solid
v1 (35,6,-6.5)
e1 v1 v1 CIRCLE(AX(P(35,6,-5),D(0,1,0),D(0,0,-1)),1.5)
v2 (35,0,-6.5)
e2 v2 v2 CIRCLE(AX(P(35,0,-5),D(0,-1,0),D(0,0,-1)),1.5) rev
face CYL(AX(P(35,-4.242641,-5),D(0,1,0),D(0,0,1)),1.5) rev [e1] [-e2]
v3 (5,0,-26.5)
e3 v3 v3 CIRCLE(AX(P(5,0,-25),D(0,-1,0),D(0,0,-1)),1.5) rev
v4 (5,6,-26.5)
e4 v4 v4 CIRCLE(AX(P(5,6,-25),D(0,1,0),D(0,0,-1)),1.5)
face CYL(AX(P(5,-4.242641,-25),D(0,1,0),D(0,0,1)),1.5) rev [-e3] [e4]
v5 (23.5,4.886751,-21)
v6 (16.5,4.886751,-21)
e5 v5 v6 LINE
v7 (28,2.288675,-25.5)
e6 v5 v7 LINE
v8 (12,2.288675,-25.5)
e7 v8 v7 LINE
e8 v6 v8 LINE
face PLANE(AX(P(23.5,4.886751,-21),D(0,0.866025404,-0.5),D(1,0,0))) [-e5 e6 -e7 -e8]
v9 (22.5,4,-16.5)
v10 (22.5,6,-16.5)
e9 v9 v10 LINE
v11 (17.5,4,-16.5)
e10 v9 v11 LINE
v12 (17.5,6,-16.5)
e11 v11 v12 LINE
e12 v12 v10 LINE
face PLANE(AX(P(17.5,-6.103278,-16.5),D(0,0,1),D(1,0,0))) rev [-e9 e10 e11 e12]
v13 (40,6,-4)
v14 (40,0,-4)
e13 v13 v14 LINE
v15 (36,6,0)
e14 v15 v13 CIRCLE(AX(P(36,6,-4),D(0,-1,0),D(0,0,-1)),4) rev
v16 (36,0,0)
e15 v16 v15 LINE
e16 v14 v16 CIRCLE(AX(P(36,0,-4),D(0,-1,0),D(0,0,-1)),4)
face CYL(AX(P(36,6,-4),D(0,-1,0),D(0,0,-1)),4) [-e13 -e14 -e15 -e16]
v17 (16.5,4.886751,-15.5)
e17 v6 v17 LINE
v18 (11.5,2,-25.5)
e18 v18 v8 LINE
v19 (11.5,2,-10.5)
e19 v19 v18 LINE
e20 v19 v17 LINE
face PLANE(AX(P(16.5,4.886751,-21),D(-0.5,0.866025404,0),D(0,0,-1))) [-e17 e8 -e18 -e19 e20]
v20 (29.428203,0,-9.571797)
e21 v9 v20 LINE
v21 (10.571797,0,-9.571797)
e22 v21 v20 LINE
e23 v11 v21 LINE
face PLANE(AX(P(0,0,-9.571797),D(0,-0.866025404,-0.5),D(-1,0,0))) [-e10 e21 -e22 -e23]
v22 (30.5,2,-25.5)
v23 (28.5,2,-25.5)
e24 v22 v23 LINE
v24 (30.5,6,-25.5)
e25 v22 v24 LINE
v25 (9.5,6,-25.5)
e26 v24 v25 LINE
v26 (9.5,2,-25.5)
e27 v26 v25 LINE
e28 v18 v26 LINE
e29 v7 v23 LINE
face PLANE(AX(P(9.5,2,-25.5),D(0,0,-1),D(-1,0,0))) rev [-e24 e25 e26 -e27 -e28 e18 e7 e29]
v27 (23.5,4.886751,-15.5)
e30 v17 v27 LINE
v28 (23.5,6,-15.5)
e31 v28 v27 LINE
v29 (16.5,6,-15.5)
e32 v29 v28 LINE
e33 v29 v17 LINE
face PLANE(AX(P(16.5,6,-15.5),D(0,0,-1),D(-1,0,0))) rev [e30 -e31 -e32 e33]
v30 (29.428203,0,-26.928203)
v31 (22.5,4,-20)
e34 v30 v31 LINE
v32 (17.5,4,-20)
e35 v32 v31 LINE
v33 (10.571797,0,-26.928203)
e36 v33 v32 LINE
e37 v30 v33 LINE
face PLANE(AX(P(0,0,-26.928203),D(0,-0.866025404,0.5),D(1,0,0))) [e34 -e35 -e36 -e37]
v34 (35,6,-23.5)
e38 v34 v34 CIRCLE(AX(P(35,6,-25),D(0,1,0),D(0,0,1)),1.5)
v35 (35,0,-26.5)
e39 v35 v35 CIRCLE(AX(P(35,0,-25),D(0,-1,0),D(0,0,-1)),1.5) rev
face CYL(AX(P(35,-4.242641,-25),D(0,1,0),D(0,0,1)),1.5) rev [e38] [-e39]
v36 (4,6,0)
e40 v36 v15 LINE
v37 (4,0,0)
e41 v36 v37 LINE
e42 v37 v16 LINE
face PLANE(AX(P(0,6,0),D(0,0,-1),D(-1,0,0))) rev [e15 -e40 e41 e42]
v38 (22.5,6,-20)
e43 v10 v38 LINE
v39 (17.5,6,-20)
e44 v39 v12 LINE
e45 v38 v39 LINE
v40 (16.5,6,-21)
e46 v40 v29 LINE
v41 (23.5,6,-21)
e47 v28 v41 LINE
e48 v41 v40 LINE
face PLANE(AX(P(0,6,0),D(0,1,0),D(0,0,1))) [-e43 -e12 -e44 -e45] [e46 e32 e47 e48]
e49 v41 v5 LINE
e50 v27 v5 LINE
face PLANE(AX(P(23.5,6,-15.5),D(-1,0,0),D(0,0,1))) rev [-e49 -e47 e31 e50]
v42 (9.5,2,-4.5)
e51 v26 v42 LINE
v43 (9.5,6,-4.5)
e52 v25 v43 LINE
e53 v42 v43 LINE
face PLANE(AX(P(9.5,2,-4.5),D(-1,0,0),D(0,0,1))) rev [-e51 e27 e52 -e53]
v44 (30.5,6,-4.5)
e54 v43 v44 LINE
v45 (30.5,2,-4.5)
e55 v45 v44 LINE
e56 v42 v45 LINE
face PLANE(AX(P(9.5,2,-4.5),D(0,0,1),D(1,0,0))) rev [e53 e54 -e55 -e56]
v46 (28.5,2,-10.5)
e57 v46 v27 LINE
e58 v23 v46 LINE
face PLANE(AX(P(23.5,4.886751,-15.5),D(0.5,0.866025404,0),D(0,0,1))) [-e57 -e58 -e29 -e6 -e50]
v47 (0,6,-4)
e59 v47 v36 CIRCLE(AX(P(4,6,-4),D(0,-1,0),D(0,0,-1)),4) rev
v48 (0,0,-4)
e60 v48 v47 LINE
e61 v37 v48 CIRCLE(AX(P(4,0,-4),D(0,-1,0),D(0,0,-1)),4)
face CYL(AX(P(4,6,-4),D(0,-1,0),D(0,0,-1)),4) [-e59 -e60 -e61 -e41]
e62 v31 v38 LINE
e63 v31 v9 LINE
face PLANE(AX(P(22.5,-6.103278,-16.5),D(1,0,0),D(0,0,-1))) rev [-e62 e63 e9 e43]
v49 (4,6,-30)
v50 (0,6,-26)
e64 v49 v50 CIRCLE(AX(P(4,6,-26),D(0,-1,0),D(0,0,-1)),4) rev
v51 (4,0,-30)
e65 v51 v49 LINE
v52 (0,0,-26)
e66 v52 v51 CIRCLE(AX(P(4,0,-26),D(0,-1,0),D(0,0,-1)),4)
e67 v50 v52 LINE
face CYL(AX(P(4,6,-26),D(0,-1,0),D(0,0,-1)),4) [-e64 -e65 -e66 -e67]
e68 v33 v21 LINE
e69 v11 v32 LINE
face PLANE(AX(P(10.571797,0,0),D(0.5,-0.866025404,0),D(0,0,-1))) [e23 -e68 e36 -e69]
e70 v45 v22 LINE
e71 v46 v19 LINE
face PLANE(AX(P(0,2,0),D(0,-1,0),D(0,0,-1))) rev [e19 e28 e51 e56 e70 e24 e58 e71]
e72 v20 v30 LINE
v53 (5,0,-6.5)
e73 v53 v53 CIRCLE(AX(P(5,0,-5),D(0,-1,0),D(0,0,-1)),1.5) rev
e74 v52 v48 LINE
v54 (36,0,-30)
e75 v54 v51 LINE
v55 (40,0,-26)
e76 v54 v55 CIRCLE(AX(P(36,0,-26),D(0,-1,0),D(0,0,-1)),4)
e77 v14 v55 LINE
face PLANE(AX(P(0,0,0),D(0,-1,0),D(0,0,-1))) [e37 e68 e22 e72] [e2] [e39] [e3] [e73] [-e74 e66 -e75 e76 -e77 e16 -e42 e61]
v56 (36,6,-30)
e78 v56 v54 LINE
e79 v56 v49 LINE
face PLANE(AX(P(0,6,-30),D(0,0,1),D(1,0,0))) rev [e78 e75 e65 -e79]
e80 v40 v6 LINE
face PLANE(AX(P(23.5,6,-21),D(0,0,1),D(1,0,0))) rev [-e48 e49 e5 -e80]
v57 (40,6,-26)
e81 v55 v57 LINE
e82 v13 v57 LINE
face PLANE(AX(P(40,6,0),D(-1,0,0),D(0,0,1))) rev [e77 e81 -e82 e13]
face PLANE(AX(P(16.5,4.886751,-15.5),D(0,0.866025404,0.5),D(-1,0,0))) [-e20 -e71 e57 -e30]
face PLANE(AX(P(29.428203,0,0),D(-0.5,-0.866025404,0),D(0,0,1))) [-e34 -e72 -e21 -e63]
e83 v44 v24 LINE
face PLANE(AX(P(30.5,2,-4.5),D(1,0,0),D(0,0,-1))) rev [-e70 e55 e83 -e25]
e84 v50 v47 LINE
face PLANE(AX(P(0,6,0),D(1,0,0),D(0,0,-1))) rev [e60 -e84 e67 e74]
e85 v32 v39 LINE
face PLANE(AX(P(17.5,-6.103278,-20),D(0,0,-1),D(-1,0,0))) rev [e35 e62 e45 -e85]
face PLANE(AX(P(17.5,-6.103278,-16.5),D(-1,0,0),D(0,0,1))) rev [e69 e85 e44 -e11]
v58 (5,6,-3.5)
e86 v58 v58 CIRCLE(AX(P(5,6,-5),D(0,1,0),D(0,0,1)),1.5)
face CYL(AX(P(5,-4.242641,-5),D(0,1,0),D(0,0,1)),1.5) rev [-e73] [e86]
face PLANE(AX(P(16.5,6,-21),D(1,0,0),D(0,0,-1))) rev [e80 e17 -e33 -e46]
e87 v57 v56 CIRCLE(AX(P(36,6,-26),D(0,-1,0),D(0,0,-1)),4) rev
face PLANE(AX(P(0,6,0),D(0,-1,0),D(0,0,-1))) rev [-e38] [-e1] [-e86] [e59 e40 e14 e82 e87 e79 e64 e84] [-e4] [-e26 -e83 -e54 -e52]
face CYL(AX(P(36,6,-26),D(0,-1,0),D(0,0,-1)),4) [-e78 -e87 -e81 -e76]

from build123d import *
from OCP.BRepFilletAPI import BRepFilletAPI_MakeChamfer

# Parameters (mm, degrees)
SKETCH1_W           = 40
SKETCH1_H           = 30
BOSS_EXTRUDE1_DEPTH = 6
SKETCH2_R           = 1.5
CUT_EXTRUDE1_DEPTH  = 6
FILLET1_R           = 4
SKETCH3_W           = 21
SKETCH3_H           = 21
CUT_EXTRUDE2_DEPTH  = 4
SKETCH6_W           = 5
SKETCH6_H           = 3.5
CUT_EXTRUDE3_DEPTH  = 2
SKETCH7_W           = 7
SKETCH7_H           = 5.5
SKETCH7_W_2         = 5
SKETCH7_H_2         = 3.5
BOSS_EXTRUDE2_DEPTH = 4
CHAMFER1_SIZE       = 4
CHAMFER1_SIZE2      = 6.92820323
CHAMFER2_SIZE       = 2.886751346
CHAMFER2_SIZE_2     = 5


with BuildPart() as part:
    # Sketch1 → Boss-Extrude1 (new body)
    with BuildSketch(Plane(origin=(0, 0, 0), x_dir=(1, 0, 0), z_dir=(0, 1, 0))):
        with Locations((20, 15)):
            Rectangle(SKETCH1_W, SKETCH1_H)
    extrude(amount=BOSS_EXTRUDE1_DEPTH)

    # Sketch2 → Cut-Extrude1 (cut)
    with BuildSketch(Plane(origin=(0, 6, 0), x_dir=(1, 0, 0), z_dir=(0, 1, 0))):
        with Locations(Location((5, 5, 0), (0, 0, 270))):
            Circle(SKETCH2_R)
        with Locations(Location((5, 25, 0), (0, 0, 90))):
            Circle(SKETCH2_R)
        with Locations(Location((35, 5, 0), (0, 0, 90))):
            Circle(SKETCH2_R)
        with Locations(Location((35, 25, 0), (0, 0, 270))):
            Circle(SKETCH2_R)
    extrude(amount=-CUT_EXTRUDE1_DEPTH, mode=Mode.SUBTRACT)

    # Fillet1
    fillet1_edges = [part.edges().sort_by_distance(p)[0] for p in [
        (0, 3, -30),
        (40, 3, -30),
        (40, 3, 0),
        (0, 3, 0),
    ]]
    fillet(fillet1_edges, radius=FILLET1_R)

    # Sketch3 → Cut-Extrude2 (cut)
    with BuildSketch(Plane(origin=(0, 6, 0), x_dir=(1, 0, 0), z_dir=(0, 1, 0))):
        with Locations((20, 15)):
            Rectangle(SKETCH3_W, SKETCH3_H)
    extrude(amount=-CUT_EXTRUDE2_DEPTH, mode=Mode.SUBTRACT)

    # Sketch6 → Cut-Extrude3 (cut)
    with BuildSketch(Plane(origin=(0, 2, 0), x_dir=(1, 0, 0), z_dir=(0, 1, 0))):
        with Locations((20, 18.25)):
            Rectangle(SKETCH6_W, SKETCH6_H)
    extrude(amount=-CUT_EXTRUDE3_DEPTH, mode=Mode.SUBTRACT)

    # Sketch7 → Boss-Extrude2 (add)
    with BuildSketch(Plane(origin=(0, 2, 0), x_dir=(1, 0, 0), z_dir=(0, 1, 0))):
        with Locations((20, 18.25)):
            Rectangle(SKETCH7_W, SKETCH7_H)
        with Locations((20, 18.25)):
            Rectangle(SKETCH7_W_2, SKETCH7_H_2, mode=Mode.SUBTRACT)
    extrude(amount=BOSS_EXTRUDE2_DEPTH)

    # Chamfer1: one chamfer whose edges measure the first distance from different faces: ONE call of the kernel's chamfer builder (chamfer() names one face for all edges)
    chamfer1_edges_1 = [part.edges().sort_by_distance(p)[0] for p in [
        (20, 0, -16.5),
    ]]
    chamfer1_side_1 = [part.faces().sort_by_distance(p)[0] for p in [
        (20, 3, -16.5),
    ]]
    chamfer1_edges_2 = [part.edges().sort_by_distance(p)[0] for p in [
        (22.5, 0, -18.25),
    ]]
    chamfer1_side_2 = [part.faces().sort_by_distance(p)[0] for p in [
        (22.5, 3, -18.25),
    ]]
    chamfer1_edges_3 = [part.edges().sort_by_distance(p)[0] for p in [
        (20, 0, -20),
    ]]
    chamfer1_side_3 = [part.faces().sort_by_distance(p)[0] for p in [
        (20, 3, -20),
    ]]
    chamfer1_edges_4 = [part.edges().sort_by_distance(p)[0] for p in [
        (17.5, 0, -18.25),
    ]]
    chamfer1_side_4 = [part.faces().sort_by_distance(p)[0] for p in [
        (17.5, 3, -18.25),
    ]]
    chamfer1 = BRepFilletAPI_MakeChamfer(part.part.solid().wrapped)
    for e in chamfer1_edges_1:
        chamfer1.Add(CHAMFER1_SIZE, CHAMFER1_SIZE2, e.wrapped, chamfer1_side_1[0].wrapped)  # the first distance lies on this face
    for e in chamfer1_edges_2:
        chamfer1.Add(CHAMFER1_SIZE, CHAMFER1_SIZE2, e.wrapped, chamfer1_side_2[0].wrapped)  # the first distance lies on this face
    for e in chamfer1_edges_3:
        chamfer1.Add(CHAMFER1_SIZE, CHAMFER1_SIZE2, e.wrapped, chamfer1_side_3[0].wrapped)  # the first distance lies on this face
    for e in chamfer1_edges_4:
        chamfer1.Add(CHAMFER1_SIZE, CHAMFER1_SIZE2, e.wrapped, chamfer1_side_4[0].wrapped)  # the first distance lies on this face
    add(Compound.cast(chamfer1.Shape()), mode=Mode.REPLACE)

    # Chamfer2
    # the kernel refuses this chamfer: 5, 2.886751346 mm, written as the material it adds along each edge
    with BuildSketch(Plane(origin=(16.5, 2, -33.935428773), x_dir=(0, 1, 0), z_dir=(0, 0, 1))) as chamfer2_piece_1_section:
        Polygon((CHAMFER2_SIZE, 0), (0, CHAMFER2_SIZE_2), (0, 0), align=None)
    chamfer2_piece_1 = extrude(amount=31.370857546, mode=Mode.PRIVATE)
    chamfer2_piece_1 = split(chamfer2_piece_1, bisect_by=Plane(origin=(15.883974596, 3.066987298, -33.935428773), z_dir=(-0.499999999999998, 0.8660254037844398, 0)), keep=Keep.TOP, mode=Mode.PRIVATE)
    chamfer2_piece_1 = split(chamfer2_piece_1, bisect_by=Plane(origin=(16.5, -1.436141454, -31.95157158), z_dir=(0, -0.8660254037844382, 0.500000000000001)), keep=Keep.TOP, mode=Mode.PRIVATE)
    chamfer2_piece_1 = split(chamfer2_piece_1, bisect_by=Plane(origin=(16.5, 12.147838333, -28.07657158), z_dir=(0, -0.8660254037844382, -0.500000000000001)), keep=Keep.TOP, mode=Mode.PRIVATE)
    with BuildSketch(Plane(origin=(16.5, 2, -33.935428773), x_dir=(0, 1, 0), z_dir=(0, 0, 1))) as chamfer2_piece_2_section:
        Polygon((CHAMFER2_SIZE, 0), (0, CHAMFER2_SIZE_2), (0, 0), align=None)
    chamfer2_piece_2 = extrude(amount=31.370857546, mode=Mode.PRIVATE)
    chamfer2_piece_2 = split(chamfer2_piece_2, bisect_by=Plane(origin=(16.5, -2.534217665, -31.317596984), z_dir=(0, 0.8660254037844398, -0.499999999999998)), keep=Keep.TOP, mode=Mode.PRIVATE)
    chamfer2_piece_2 = split(chamfer2_piece_2, bisect_by=Plane(origin=(16.5, -1.436141454, -31.95157158), z_dir=(0, -0.8660254037844382, 0.500000000000001)), keep=Keep.TOP, mode=Mode.PRIVATE)
    with BuildSketch(Plane(origin=(16.5, 2, -33.935428773), x_dir=(0, 1, 0), z_dir=(0, 0, 1))) as chamfer2_piece_3_section:
        Polygon((CHAMFER2_SIZE, 0), (0, CHAMFER2_SIZE_2), (0, 0), align=None)
    chamfer2_piece_3 = extrude(amount=31.370857546, mode=Mode.PRIVATE)
    chamfer2_piece_3 = split(chamfer2_piece_3, bisect_by=Plane(origin=(16.5, 11.049762122, -28.710546176), z_dir=(0, 0.8660254037844398, 0.499999999999998)), keep=Keep.TOP, mode=Mode.PRIVATE)
    chamfer2_piece_3 = split(chamfer2_piece_3, bisect_by=Plane(origin=(16.5, 12.147838333, -28.07657158), z_dir=(0, -0.8660254037844382, -0.500000000000001)), keep=Keep.TOP, mode=Mode.PRIVATE)
    with BuildSketch(Plane(origin=(3.564571227, 2, -15.5), x_dir=(0, 1, 0), z_dir=(1, 0, 0))) as chamfer2_piece_4_section:
        Polygon((CHAMFER2_SIZE, 0), (0, CHAMFER2_SIZE_2), (0, 0), align=None)
    chamfer2_piece_4 = extrude(amount=32.870857546, mode=Mode.PRIVATE)
    chamfer2_piece_4 = split(chamfer2_piece_4, bisect_by=Plane(origin=(3.564571227, 3.066987298, -14.883974596), z_dir=(0, 0.8660254037844398, 0.499999999999998)), keep=Keep.TOP, mode=Mode.PRIVATE)
    chamfer2_piece_4 = split(chamfer2_piece_4, bisect_by=Plane(origin=(9.79842842, 12.797357386, -15.5), z_dir=(-0.500000000000001, -0.8660254037844382, 0)), keep=Keep.TOP, mode=Mode.PRIVATE)
    chamfer2_piece_4 = split(chamfer2_piece_4, bisect_by=Plane(origin=(5.54842842, -1.436141454, -15.5), z_dir=(0.500000000000001, -0.8660254037844382, 0)), keep=Keep.TOP, mode=Mode.PRIVATE)
    with BuildSketch(Plane(origin=(3.564571227, 2, -15.5), x_dir=(0, 1, 0), z_dir=(1, 0, 0))) as chamfer2_piece_5_section:
        Polygon((CHAMFER2_SIZE, 0), (0, CHAMFER2_SIZE_2), (0, 0), align=None)
    chamfer2_piece_5 = extrude(amount=32.870857546, mode=Mode.PRIVATE)
    chamfer2_piece_5 = split(chamfer2_piece_5, bisect_by=Plane(origin=(6.182403016, -2.534217665, -15.5), z_dir=(-0.499999999999998, 0.8660254037844398, 0)), keep=Keep.TOP, mode=Mode.PRIVATE)
    chamfer2_piece_5 = split(chamfer2_piece_5, bisect_by=Plane(origin=(5.54842842, -1.436141454, -15.5), z_dir=(0.500000000000001, -0.8660254037844382, 0)), keep=Keep.TOP, mode=Mode.PRIVATE)
    with BuildSketch(Plane(origin=(23.5, 2, -2.564571227), x_dir=(0, 1, 0), z_dir=(0, 0, -1))) as chamfer2_piece_6_section:
        Polygon((CHAMFER2_SIZE, 0), (0, CHAMFER2_SIZE_2), (0, 0), align=None)
    chamfer2_piece_6 = extrude(amount=31.370857546, mode=Mode.PRIVATE)
    chamfer2_piece_6 = split(chamfer2_piece_6, bisect_by=Plane(origin=(24.116025404, 3.066987298, -2.564571227), z_dir=(0.499999999999998, 0.8660254037844398, 0)), keep=Keep.TOP, mode=Mode.PRIVATE)
    chamfer2_piece_6 = split(chamfer2_piece_6, bisect_by=Plane(origin=(23.5, 12.147838333, -8.42342842), z_dir=(0, -0.8660254037844382, 0.500000000000001)), keep=Keep.TOP, mode=Mode.PRIVATE)
    chamfer2_piece_6 = split(chamfer2_piece_6, bisect_by=Plane(origin=(23.5, -1.436141454, -4.54842842), z_dir=(0, -0.8660254037844382, -0.500000000000001)), keep=Keep.TOP, mode=Mode.PRIVATE)
    with BuildSketch(Plane(origin=(23.5, 2, -2.564571227), x_dir=(0, 1, 0), z_dir=(0, 0, -1))) as chamfer2_piece_7_section:
        Polygon((CHAMFER2_SIZE, 0), (0, CHAMFER2_SIZE_2), (0, 0), align=None)
    chamfer2_piece_7 = extrude(amount=31.370857546, mode=Mode.PRIVATE)
    chamfer2_piece_7 = split(chamfer2_piece_7, bisect_by=Plane(origin=(23.5, -2.534217665, -5.182403016), z_dir=(0, 0.8660254037844398, 0.499999999999998)), keep=Keep.TOP, mode=Mode.PRIVATE)
    chamfer2_piece_7 = split(chamfer2_piece_7, bisect_by=Plane(origin=(23.5, -1.436141454, -4.54842842), z_dir=(0, -0.8660254037844382, -0.500000000000001)), keep=Keep.TOP, mode=Mode.PRIVATE)
    with BuildSketch(Plane(origin=(23.5, 2, -2.564571227), x_dir=(0, 1, 0), z_dir=(0, 0, -1))) as chamfer2_piece_8_section:
        Polygon((CHAMFER2_SIZE, 0), (0, CHAMFER2_SIZE_2), (0, 0), align=None)
    chamfer2_piece_8 = extrude(amount=31.370857546, mode=Mode.PRIVATE)
    chamfer2_piece_8 = split(chamfer2_piece_8, bisect_by=Plane(origin=(23.5, 11.049762122, -7.789453824), z_dir=(0, 0.8660254037844398, -0.499999999999998)), keep=Keep.TOP, mode=Mode.PRIVATE)
    chamfer2_piece_8 = split(chamfer2_piece_8, bisect_by=Plane(origin=(23.5, 12.147838333, -8.42342842), z_dir=(0, -0.8660254037844382, 0.500000000000001)), keep=Keep.TOP, mode=Mode.PRIVATE)
    with BuildSketch(Plane(origin=(36.435428773, 2, -21), x_dir=(0, 1, 0), z_dir=(-1, 0, 0))) as chamfer2_piece_9_section:
        Polygon((CHAMFER2_SIZE, 0), (0, CHAMFER2_SIZE_2), (0, 0), align=None)
    chamfer2_piece_9 = extrude(amount=32.870857546, mode=Mode.PRIVATE)
    chamfer2_piece_9 = split(chamfer2_piece_9, bisect_by=Plane(origin=(36.435428773, 3.066987298, -21.616025404), z_dir=(0, 0.8660254037844398, -0.499999999999998)), keep=Keep.TOP, mode=Mode.PRIVATE)
    chamfer2_piece_9 = split(chamfer2_piece_9, bisect_by=Plane(origin=(34.45157158, -1.436141454, -21), z_dir=(-0.500000000000001, -0.8660254037844382, 0)), keep=Keep.TOP, mode=Mode.PRIVATE)
    chamfer2_piece_9 = split(chamfer2_piece_9, bisect_by=Plane(origin=(30.20157158, 12.797357386, -21), z_dir=(0.500000000000001, -0.8660254037844382, 0)), keep=Keep.TOP, mode=Mode.PRIVATE)
    with BuildSketch(Plane(origin=(36.435428773, 2, -21), x_dir=(0, 1, 0), z_dir=(-1, 0, 0))) as chamfer2_piece_10_section:
        Polygon((CHAMFER2_SIZE, 0), (0, CHAMFER2_SIZE_2), (0, 0), align=None)
    chamfer2_piece_10 = extrude(amount=32.870857546, mode=Mode.PRIVATE)
    chamfer2_piece_10 = split(chamfer2_piece_10, bisect_by=Plane(origin=(30.835546176, 11.699281175, -21), z_dir=(-0.499999999999998, 0.8660254037844398, 0)), keep=Keep.TOP, mode=Mode.PRIVATE)
    chamfer2_piece_10 = split(chamfer2_piece_10, bisect_by=Plane(origin=(30.20157158, 12.797357386, -21), z_dir=(0.500000000000001, -0.8660254037844382, 0)), keep=Keep.TOP, mode=Mode.PRIVATE)
    add([chamfer2_piece_1, chamfer2_piece_2, chamfer2_piece_3, chamfer2_piece_4, chamfer2_piece_5, chamfer2_piece_6, chamfer2_piece_7, chamfer2_piece_8, chamfer2_piece_9, chamfer2_piece_10])


solid = part.part
